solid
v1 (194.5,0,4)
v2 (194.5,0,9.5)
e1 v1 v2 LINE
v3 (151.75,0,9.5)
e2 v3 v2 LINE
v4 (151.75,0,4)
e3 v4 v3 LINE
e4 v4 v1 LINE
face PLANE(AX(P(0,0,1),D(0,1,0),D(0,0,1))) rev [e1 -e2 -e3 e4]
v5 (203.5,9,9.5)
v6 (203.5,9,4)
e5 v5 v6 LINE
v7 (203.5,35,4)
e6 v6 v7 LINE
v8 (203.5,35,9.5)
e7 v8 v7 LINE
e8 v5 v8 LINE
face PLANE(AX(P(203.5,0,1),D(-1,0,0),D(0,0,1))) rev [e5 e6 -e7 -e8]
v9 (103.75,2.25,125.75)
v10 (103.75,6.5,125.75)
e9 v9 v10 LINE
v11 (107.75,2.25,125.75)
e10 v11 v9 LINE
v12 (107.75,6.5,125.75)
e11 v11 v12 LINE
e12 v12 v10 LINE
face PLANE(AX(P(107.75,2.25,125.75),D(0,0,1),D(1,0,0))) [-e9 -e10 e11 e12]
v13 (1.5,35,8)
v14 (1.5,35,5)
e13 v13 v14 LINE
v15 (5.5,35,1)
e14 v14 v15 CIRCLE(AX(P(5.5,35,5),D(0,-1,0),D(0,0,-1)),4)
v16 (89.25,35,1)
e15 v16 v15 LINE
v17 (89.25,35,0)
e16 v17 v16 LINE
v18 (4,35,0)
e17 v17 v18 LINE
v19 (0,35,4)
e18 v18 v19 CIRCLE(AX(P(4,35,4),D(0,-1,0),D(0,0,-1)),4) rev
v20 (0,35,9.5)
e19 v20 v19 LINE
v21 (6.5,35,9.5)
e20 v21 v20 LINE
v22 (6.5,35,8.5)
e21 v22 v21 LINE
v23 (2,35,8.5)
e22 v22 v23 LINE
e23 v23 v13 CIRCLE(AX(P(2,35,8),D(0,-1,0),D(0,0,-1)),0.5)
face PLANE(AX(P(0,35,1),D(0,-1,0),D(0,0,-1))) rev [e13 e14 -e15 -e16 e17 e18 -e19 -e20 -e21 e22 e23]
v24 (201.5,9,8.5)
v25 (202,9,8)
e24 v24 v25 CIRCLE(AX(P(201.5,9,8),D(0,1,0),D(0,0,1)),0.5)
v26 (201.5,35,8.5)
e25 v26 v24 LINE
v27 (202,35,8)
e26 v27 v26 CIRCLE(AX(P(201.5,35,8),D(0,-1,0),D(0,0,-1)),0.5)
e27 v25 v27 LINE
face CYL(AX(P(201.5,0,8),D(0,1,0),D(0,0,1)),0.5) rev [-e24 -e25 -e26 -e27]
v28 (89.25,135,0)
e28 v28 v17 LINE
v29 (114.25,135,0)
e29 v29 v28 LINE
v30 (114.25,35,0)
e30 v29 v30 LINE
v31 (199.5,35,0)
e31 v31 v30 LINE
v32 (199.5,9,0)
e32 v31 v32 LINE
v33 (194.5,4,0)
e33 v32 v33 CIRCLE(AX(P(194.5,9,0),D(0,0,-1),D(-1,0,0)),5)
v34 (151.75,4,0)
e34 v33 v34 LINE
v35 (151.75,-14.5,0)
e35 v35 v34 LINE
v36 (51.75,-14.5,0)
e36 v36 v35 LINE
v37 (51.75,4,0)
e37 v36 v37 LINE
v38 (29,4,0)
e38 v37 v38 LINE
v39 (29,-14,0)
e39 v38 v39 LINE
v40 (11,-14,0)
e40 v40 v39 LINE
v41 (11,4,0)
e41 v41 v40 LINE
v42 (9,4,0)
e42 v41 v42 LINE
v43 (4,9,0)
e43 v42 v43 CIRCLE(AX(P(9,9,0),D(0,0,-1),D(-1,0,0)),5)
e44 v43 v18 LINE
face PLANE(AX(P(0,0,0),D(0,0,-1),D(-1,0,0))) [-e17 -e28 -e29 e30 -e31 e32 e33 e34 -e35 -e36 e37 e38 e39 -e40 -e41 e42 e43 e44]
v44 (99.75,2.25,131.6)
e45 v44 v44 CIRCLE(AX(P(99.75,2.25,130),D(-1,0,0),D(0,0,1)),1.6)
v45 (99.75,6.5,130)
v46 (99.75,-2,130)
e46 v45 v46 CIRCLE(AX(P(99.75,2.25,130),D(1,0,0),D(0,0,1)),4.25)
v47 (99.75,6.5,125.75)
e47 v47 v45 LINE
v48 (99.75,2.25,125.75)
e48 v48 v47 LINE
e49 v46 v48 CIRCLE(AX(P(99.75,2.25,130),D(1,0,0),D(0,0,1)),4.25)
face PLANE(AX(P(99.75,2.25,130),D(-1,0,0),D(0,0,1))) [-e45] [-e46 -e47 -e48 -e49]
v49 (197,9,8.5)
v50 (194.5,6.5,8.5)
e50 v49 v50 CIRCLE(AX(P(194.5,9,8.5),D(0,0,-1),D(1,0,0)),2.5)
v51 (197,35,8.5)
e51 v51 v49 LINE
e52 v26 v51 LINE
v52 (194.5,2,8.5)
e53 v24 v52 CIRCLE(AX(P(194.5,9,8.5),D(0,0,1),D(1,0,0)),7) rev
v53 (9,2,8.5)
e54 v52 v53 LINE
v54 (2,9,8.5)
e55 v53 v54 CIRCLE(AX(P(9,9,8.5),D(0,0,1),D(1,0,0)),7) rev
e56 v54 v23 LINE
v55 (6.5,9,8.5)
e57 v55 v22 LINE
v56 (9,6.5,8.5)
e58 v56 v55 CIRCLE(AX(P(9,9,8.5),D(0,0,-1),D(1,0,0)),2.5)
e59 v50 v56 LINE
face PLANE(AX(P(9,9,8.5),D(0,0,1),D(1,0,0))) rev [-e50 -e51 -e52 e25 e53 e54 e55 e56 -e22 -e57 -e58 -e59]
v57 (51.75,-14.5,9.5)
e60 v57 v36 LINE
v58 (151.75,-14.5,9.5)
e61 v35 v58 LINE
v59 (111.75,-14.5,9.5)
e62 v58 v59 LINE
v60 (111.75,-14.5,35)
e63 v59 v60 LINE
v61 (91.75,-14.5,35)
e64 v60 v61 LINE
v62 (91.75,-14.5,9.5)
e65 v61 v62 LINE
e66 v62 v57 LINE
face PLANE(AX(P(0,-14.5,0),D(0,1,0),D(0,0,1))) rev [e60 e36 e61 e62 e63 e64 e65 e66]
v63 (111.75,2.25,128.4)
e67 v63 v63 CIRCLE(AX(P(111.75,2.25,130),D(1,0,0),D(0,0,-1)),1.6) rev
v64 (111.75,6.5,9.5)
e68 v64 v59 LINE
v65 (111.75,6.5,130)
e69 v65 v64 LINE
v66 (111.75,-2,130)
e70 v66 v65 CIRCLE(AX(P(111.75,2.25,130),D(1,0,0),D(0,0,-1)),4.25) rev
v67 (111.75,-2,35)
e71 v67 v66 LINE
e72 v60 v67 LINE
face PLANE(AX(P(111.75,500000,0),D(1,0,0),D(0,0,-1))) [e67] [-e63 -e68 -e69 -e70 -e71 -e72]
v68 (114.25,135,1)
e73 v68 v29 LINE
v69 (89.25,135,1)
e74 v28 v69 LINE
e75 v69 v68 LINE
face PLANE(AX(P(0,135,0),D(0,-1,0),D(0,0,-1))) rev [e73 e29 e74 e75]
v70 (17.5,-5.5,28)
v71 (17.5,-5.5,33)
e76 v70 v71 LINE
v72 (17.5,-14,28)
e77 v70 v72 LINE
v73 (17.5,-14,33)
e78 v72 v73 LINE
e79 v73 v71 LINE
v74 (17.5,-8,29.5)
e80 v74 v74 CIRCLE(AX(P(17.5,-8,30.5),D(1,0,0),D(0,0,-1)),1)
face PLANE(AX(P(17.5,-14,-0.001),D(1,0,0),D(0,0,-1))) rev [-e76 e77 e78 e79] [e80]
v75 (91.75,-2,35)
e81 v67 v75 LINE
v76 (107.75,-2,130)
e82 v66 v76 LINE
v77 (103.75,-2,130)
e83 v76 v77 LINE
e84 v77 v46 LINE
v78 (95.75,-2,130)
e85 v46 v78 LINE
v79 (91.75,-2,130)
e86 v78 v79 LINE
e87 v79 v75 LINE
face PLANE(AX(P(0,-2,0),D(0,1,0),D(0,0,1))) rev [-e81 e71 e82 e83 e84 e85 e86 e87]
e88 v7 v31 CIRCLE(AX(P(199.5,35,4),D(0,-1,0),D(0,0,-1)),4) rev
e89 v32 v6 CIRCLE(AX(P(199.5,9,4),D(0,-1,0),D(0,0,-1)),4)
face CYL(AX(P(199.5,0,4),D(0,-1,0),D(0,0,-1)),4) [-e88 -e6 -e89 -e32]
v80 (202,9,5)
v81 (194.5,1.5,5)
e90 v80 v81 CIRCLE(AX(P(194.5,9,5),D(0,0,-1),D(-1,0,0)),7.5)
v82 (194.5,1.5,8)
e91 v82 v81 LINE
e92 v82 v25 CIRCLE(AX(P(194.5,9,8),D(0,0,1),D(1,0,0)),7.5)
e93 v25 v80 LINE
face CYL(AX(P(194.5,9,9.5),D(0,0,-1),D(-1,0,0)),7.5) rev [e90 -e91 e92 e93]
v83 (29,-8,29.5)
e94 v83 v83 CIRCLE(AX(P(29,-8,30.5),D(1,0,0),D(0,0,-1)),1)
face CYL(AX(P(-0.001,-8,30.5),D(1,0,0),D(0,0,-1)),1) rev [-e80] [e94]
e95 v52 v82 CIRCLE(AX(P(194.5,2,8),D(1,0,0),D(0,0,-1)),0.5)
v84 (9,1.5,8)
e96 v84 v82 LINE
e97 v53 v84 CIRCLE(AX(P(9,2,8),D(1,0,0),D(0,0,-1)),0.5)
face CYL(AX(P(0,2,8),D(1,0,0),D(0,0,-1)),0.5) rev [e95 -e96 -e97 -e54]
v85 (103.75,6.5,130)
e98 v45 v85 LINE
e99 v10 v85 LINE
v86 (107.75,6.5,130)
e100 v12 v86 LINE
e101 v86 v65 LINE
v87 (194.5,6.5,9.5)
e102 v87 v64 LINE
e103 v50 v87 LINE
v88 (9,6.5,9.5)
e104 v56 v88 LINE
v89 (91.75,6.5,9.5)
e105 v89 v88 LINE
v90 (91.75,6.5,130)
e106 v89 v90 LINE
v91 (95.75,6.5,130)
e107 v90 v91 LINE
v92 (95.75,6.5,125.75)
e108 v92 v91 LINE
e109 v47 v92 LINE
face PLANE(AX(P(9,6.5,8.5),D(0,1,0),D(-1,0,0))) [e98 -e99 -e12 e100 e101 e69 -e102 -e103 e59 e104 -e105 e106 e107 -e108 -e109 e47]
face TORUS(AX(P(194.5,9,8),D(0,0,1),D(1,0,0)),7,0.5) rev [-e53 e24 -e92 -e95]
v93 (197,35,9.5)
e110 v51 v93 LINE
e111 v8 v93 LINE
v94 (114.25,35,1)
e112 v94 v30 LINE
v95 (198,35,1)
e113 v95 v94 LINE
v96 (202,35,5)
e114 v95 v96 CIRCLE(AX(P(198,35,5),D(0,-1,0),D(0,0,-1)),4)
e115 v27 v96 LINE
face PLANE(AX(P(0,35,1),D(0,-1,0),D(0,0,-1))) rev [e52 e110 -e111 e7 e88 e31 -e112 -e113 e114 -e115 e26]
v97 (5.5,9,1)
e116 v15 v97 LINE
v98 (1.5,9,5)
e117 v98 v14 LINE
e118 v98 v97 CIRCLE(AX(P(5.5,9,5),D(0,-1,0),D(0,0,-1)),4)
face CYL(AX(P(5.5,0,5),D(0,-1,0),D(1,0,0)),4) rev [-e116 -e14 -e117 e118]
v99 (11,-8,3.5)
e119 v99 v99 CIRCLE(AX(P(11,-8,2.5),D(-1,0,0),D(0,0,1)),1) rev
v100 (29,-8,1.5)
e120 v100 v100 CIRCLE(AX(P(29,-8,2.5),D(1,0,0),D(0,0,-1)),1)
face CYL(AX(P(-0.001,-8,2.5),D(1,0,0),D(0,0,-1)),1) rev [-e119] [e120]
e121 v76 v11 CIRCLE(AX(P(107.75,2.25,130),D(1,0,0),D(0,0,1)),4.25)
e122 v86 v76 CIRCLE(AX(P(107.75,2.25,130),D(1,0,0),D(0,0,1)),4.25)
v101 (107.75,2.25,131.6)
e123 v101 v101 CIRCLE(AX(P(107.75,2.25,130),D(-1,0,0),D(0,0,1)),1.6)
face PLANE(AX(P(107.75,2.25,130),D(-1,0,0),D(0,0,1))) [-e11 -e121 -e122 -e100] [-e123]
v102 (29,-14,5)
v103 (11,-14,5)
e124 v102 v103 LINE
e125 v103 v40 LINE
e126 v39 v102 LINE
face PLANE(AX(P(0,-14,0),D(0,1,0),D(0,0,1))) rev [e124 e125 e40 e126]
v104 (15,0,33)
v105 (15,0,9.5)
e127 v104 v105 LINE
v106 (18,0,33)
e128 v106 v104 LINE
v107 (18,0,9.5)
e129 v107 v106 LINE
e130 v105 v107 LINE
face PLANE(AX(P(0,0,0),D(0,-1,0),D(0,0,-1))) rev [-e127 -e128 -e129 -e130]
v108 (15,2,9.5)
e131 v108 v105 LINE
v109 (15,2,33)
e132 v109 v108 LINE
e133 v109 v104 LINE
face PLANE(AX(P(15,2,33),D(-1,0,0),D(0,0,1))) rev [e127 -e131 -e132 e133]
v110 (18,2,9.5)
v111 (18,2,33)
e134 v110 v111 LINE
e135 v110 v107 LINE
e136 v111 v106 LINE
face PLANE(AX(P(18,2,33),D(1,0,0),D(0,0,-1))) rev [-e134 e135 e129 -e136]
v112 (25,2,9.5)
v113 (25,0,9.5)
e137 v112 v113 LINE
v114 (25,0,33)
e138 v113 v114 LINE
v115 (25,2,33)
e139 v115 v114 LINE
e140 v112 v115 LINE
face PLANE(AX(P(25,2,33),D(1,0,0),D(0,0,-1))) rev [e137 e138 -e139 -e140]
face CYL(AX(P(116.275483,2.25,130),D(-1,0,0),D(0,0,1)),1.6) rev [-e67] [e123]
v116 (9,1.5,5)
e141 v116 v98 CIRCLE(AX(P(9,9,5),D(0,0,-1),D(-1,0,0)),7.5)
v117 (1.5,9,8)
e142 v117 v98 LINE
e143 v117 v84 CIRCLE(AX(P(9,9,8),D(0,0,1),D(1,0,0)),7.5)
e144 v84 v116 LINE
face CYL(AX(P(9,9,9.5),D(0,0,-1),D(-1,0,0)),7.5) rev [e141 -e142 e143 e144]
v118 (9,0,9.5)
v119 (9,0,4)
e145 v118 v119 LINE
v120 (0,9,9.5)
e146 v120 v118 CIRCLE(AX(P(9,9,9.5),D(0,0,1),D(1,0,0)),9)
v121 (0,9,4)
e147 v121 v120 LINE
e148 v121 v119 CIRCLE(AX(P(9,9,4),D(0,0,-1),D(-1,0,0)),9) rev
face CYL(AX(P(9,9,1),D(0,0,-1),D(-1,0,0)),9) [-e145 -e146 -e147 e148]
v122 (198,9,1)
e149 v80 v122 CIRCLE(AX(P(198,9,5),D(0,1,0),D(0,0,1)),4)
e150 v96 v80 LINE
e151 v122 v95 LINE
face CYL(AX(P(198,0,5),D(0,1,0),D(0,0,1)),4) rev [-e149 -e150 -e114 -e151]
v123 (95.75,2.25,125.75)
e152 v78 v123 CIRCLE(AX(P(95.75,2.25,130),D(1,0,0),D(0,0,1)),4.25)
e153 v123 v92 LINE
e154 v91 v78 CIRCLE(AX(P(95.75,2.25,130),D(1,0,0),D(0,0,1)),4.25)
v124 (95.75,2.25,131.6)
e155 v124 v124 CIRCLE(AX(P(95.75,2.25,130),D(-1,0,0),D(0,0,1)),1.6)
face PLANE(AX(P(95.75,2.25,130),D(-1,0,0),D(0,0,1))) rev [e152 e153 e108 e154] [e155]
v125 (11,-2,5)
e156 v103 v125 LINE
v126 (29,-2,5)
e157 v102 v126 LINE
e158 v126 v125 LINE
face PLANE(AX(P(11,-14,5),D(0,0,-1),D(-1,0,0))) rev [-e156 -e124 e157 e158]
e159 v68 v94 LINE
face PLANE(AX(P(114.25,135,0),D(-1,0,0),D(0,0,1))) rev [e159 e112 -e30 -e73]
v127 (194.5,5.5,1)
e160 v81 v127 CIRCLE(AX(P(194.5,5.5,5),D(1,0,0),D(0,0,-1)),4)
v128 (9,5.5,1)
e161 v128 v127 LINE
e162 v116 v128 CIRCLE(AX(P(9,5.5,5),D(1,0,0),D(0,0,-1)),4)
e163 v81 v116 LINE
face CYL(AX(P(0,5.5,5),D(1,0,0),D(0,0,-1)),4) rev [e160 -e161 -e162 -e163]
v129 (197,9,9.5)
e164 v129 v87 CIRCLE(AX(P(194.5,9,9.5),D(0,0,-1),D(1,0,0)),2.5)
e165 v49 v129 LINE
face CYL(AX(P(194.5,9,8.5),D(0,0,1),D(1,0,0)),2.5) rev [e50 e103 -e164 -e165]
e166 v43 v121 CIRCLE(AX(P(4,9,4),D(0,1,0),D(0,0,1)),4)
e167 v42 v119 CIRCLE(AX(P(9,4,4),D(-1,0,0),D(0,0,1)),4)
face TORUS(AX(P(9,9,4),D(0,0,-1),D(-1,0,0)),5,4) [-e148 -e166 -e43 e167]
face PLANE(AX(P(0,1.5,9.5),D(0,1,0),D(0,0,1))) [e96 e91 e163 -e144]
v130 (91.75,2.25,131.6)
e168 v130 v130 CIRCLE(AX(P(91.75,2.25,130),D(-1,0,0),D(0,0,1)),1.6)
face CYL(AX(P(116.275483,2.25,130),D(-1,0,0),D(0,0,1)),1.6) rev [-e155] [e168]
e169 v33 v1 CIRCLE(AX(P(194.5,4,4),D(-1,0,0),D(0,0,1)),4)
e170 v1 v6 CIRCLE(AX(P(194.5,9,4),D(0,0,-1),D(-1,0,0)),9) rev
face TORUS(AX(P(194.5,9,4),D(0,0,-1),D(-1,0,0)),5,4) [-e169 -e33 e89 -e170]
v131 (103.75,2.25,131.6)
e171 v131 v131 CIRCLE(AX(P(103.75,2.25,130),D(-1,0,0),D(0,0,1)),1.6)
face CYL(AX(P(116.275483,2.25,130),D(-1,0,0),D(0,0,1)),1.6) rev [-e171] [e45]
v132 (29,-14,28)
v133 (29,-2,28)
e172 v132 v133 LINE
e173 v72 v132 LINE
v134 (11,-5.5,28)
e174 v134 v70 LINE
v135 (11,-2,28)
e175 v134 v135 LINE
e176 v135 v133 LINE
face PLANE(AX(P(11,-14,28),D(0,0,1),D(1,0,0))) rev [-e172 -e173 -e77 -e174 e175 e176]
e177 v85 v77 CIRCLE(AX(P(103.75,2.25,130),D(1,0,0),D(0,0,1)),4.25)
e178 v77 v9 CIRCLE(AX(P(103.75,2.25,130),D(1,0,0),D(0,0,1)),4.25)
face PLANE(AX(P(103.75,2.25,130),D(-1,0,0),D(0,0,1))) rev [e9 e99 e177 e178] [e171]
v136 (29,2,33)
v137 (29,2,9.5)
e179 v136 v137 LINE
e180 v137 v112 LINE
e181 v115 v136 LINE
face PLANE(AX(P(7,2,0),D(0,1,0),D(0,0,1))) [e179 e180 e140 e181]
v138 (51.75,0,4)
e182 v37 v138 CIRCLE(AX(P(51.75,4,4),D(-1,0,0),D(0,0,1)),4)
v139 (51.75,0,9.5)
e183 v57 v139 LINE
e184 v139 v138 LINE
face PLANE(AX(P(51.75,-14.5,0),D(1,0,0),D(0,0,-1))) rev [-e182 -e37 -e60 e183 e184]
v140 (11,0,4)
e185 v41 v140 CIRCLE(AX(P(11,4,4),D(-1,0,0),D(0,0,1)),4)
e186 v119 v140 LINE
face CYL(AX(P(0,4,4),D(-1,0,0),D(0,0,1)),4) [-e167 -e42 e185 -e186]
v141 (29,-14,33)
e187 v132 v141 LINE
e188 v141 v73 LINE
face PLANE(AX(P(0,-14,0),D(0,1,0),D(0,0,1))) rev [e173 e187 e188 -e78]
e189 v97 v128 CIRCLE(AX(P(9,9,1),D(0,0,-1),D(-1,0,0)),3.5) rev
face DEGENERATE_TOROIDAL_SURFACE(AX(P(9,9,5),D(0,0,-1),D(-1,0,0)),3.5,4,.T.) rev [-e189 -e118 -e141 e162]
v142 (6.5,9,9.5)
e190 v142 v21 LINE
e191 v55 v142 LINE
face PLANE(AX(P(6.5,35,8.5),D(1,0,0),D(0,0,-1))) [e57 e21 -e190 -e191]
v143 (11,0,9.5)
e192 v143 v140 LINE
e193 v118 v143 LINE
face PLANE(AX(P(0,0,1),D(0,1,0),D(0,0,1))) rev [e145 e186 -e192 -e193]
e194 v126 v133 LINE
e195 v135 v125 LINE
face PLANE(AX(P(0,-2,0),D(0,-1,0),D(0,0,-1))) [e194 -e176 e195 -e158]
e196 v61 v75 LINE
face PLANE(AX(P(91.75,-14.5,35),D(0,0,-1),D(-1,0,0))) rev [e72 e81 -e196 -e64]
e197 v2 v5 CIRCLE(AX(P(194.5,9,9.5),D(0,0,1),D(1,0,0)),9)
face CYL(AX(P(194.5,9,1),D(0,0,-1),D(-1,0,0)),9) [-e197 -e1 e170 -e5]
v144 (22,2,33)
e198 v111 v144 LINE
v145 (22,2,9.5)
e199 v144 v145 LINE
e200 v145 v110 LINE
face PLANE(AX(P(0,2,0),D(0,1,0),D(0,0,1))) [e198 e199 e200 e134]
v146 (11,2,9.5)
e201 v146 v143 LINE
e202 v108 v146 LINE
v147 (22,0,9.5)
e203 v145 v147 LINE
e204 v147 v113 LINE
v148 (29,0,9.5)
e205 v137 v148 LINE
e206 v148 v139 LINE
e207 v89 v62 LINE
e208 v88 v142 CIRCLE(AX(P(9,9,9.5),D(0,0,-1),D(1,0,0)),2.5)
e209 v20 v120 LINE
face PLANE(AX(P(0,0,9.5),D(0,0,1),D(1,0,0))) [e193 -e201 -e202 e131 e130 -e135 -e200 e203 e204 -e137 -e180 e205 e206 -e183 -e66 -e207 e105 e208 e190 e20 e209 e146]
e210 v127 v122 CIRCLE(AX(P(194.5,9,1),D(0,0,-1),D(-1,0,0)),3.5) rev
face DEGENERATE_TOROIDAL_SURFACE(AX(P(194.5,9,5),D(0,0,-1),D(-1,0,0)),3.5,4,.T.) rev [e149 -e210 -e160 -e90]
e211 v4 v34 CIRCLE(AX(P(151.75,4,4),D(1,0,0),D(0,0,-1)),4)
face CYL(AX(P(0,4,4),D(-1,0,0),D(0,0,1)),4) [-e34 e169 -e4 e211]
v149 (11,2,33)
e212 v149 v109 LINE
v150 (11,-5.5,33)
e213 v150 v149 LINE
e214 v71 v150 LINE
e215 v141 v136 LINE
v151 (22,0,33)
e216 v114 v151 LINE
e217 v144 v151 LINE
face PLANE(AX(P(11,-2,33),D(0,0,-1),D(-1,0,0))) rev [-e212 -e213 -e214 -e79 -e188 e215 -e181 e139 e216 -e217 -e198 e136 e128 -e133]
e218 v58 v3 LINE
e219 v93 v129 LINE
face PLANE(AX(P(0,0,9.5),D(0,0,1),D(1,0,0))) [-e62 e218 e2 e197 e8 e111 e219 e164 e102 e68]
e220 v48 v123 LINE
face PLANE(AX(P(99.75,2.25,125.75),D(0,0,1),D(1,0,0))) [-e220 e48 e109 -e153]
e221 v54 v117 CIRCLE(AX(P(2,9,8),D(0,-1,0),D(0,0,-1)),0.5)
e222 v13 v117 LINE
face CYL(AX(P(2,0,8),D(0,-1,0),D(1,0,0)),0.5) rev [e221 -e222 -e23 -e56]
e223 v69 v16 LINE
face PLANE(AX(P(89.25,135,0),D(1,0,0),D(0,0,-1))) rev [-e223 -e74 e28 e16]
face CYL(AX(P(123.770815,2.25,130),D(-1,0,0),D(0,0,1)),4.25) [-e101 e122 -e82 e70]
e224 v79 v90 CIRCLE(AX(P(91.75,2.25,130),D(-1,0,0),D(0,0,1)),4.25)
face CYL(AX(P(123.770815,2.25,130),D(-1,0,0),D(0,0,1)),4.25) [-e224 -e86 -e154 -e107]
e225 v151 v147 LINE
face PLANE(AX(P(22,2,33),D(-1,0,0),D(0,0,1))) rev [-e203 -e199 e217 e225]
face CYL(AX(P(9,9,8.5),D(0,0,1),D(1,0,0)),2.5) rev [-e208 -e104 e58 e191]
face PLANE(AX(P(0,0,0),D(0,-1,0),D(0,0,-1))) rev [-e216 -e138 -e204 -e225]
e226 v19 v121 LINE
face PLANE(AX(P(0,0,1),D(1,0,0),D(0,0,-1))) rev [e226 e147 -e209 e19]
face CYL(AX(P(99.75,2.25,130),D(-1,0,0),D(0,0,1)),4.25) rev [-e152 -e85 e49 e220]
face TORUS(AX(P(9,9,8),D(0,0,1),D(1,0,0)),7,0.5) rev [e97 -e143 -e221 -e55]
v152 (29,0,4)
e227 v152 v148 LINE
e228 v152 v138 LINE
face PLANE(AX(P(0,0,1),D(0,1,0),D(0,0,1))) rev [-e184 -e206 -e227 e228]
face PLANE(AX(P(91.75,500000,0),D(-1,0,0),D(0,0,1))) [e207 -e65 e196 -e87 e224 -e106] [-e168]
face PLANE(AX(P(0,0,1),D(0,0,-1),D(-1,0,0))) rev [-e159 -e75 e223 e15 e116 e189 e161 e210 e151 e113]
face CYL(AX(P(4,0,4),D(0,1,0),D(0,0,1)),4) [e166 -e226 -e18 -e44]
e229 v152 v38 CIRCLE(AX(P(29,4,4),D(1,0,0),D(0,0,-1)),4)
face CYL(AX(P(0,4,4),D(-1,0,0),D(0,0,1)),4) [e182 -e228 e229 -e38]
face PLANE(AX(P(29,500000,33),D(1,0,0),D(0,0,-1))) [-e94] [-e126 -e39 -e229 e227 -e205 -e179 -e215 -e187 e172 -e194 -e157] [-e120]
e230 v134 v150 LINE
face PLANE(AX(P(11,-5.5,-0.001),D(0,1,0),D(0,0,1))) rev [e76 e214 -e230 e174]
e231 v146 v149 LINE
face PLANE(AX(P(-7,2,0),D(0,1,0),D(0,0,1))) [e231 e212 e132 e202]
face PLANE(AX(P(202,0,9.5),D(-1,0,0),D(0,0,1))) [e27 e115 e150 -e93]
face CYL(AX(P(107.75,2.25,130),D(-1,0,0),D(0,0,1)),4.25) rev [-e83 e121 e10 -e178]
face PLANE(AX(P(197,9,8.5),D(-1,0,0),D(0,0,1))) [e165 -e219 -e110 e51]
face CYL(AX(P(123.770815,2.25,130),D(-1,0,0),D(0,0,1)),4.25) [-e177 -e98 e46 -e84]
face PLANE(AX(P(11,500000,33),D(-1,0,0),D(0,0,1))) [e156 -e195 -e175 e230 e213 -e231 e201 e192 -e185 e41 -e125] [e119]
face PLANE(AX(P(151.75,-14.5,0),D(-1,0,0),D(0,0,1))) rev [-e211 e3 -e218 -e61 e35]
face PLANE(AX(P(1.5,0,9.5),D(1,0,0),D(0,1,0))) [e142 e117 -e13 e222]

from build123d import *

# Parameters (mm, degrees)
ESQUISSE1_W                    = 203.5
ESQUISSE1_H                    = 35
BOSS_EXTRU_1_DEPTH             = 1
CONG_1_R                       = 9
BOSS_EXTRU_2_START             = 8.5
BOSS_EXTRU_2_DEPTH             = 8.5
BOSS_EXTRU_3_DEPTH             = 1
CONG_2_R                       = 4
CONG_3_R                       = 0.5
BOSS_EXTRU_4_START             = 91.75
BOSS_EXTRU_4_DEPTH             = 20
ESQUISSE8_W                    = 20
ESQUISSE8_H                    = 120.5
BOSS_EXTRU_5_DEPTH             = 6.5
ESQUISSE9_R                    = 4.25
BOSS_EXTRU_6_DEPTH             = 20
BOSS_EXTRU_10_START            = 51.75
BOSS_EXTRU_10_DEPTH            = 100
BOSS_EXTRU_10_START_2          = 91.75
BOSS_EXTRU_10_2_OUTLINE_W      = 12.5
BOSS_EXTRU_10_2_OUTLINE_H      = 25.5
BOSS_EXTRU_10_2_DEPTH          = 20
ESQUISSE21_W                   = 25
ESQUISSE21_H                   = 1
BOSS_EXTRU_11_DEPTH            = 100
ENL_V_MAT_EXTRU_2_DEPTH        = 4
R_P_TITION_LIN_AIRE2_COUNT     = 2
R_P_TITION_LIN_AIRE2_PITCH     = 8
ENL_V_START                    = -20
ESQUISSE12_R                   = 1.6
ENL_V_MAT_EXTRU_4_DEPTH        = 20
BOSS_EXTRU_7_START             = 11
BOSS_EXTRU_7_DEPTH             = 18
ESQUISSE15_W                   = 18
ESQUISSE15_H                   = 5
BOSS_EXTRU_8_DEPTH             = 12
ENL_V_MAT_EXTRU_5_REACH        = 260.26
ESQUISSE16_R                   = 1
ESQUISSE17_W                   = 4
ESQUISSE17_H                   = 23.5
BOSS_EXTRU_9_DEPTH             = 2
R_P_TITION_LIN_AIRE1_COUNT     = 2
R_P_TITION_LIN_AIRE1_PITCH     = 7
R_P_TITION_LIN_AIRE1_COL_COUNT = 2
R_P_TITION_LIN_AIRE1_COL_PITCH = 7
ENL_V_MAT_EXTRU_6_REACH        = 266.365
ESQUISSE18_W                   = 6.5
ESQUISSE18_H                   = 8.5


# Read off the part's stored shape, not the designer's step: Boss.-Extru.4, Boss.-Extru.10, Boss.-Extru.7
with BuildPart() as part:
    # Esquisse1 → Boss.-Extru.1 (new body)
    with BuildSketch(Plane.XY):
        with Locations((101.75, 17.5)):
            Rectangle(ESQUISSE1_W, ESQUISSE1_H)
    extrude(amount=BOSS_EXTRU_1_DEPTH)

    # Congé1
    cong_1_edges = [part.edges().sort_by_distance(p)[0] for p in [
        (203.5, 0, 0.5),
        (0, 0, 0.5),
    ]]
    fillet(cong_1_edges, radius=CONG_1_R)

    # Esquisse3 → Boss.-Extru.2 (add)
    with BuildSketch(Plane.XY.offset(1).offset(BOSS_EXTRU_2_START)):
        with BuildLine():
            Line((1.5, 33.5), (1.5, 35))
            Line((1.5, 35), (0, 35))
            Line((0, 35), (0, 9))
            ThreePointArc((0, 9), (2.636038969, 2.636038969), (9, 0))
            Line((9, 0), (194.5, 0))
            ThreePointArc((194.5, 0), (200.863961031, 2.636038969), (203.5, 9))
            Line((203.5, 9), (203.5, 35))
            Line((203.5, 35), (202, 35))
            Line((202, 35), (202, 33.5))
            Line((202, 33.5), (202, 9))
            ThreePointArc((202, 9), (199.803300859, 3.696699141), (194.5, 1.5))
            Line((194.5, 1.5), (9, 1.5))
            ThreePointArc((9, 1.5), (3.696699141, 3.696699141), (1.5, 9))
            Line((1.5, 9), (1.5, 33.5))
        make_face()
    extrude(amount=-BOSS_EXTRU_2_DEPTH)

    # Esquisse4 → Boss.-Extru.3 (add)
    with BuildSketch(Plane.XY.offset(9.5)):
        with BuildLine():
            Line((6.5, 35), (6.5, 9))
            ThreePointArc((6.5, 9), (7.232233047, 7.232233047), (9, 6.5))
            Line((9, 6.5), (194.5, 6.5))
            ThreePointArc((194.5, 6.5), (196.267766953, 7.232233047), (197, 9))
            Line((197, 9), (197, 35))
            Line((197, 35), (203.5, 35))
            Line((203.5, 35), (203.5, 9))
            ThreePointArc((203.5, 9), (200.863961031, 2.636038969), (194.5, 0))
            Line((194.5, 0), (9, 0))
            ThreePointArc((9, 0), (2.636038969, 2.636038969), (0, 9))
            Line((0, 9), (0, 35))
            Line((0, 35), (6.5, 35))
        make_face()
    extrude(amount=-BOSS_EXTRU_3_DEPTH)

    # Congé2
    cong_2_edges = [part.edges().sort_by_distance(p)[0] for p in [
        (203.5, 22, 0),
        (101.75, 0, 0),
        (2.636038969, 2.636038969, 0),
        (200.863961031, 2.636038969, 0),
        (3.696699141, 3.696699141, 1),
        (101.75, 1.5, 1),
        (199.803300859, 3.696699141, 1),
        (202, 22, 1),
        (1.5, 22, 1),
        (0, 22, 0),
    ]]
    fillet(cong_2_edges, radius=CONG_2_R)

    # Congé3
    cong_3_edges = [part.edges().sort_by_distance(p)[0] for p in [
        (101.75, 1.5, 8.5),
        (1.5, 22, 8.5),
        (3.696699141, 3.696699141, 8.5),
        (199.803300859, 3.696699141, 8.5),
        (202, 22, 8.5),
    ]]
    fillet(cong_3_edges, radius=CONG_3_R)

    # Boss.-Extru.4 outline → Boss.-Extru.4 (add)
    with BuildSketch(Plane.YZ.offset(BOSS_EXTRU_4_START)):
        with BuildLine():
            Line((-2, 130), (-2, 0))
            Line((-2, 0), (4, 0))
            ThreePointArc((4, 0), (1.171572875, 1.171572875), (0, 4))
            Line((0, 4), (0, 130))
            Line((0, 130), (-2, 130))
        make_face()
    extrude(amount=BOSS_EXTRU_4_DEPTH)

    # Esquisse8 → Boss.-Extru.5 (add)
    with BuildSketch(Plane(origin=(0, 0, 0), x_dir=(1, 0, 0), z_dir=(0, 1, 0))):
        with Locations((101.75, -69.75)):
            Rectangle(ESQUISSE8_W, ESQUISSE8_H)
    extrude(amount=BOSS_EXTRU_5_DEPTH)

    # Esquisse9 → Boss.-Extru.6 (add)
    with BuildSketch(Plane.ZY.offset(-91.75)):
        with Locations((130, 2.25)):
            Circle(ESQUISSE9_R)
    extrude(amount=-BOSS_EXTRU_6_DEPTH)

    # Boss.-Extru.10 outline → Boss.-Extru.10 (add)
    with BuildSketch(Plane.YZ.offset(BOSS_EXTRU_10_START)):
        with BuildLine():
            Line((0, 4), (0, 9.5))
            Line((0, 9.5), (-14.5, 9.5))
            Line((-14.5, 9.5), (-14.5, 0))
            Line((-14.5, 0), (4, 0))
            ThreePointArc((4, 0), (1.171572875, 1.171572875), (0, 4))
        make_face()
    extrude(amount=BOSS_EXTRU_10_DEPTH)

    # Boss.-Extru.10 2 outline → Boss.-Extru.10 2 (add)
    with BuildSketch(Plane.YZ.offset(BOSS_EXTRU_10_START_2)):
        with Locations((-8.25, 22.25)):
            Rectangle(BOSS_EXTRU_10_2_OUTLINE_W, BOSS_EXTRU_10_2_OUTLINE_H)
    extrude(amount=BOSS_EXTRU_10_2_DEPTH)

    # Esquisse21 → Boss.-Extru.11 (add)
    with BuildSketch(Plane(origin=(0, 35, 0), x_dir=(1, 0, 0), z_dir=(0, 1, 0))):
        with Locations((101.75, -0.5)):
            Rectangle(ESQUISSE21_W, ESQUISSE21_H)
    extrude(amount=BOSS_EXTRU_11_DEPTH)

    # Esquisse10 → Enlèv. mat.-Extru.2 (cut)
    with BuildSketch(Plane(origin=(95.75, 0, 0), x_dir=(0, 0, -1), z_dir=(1, 0, 0))):
        with BuildLine():
            Line((-125.75, 2.25), (-125.75, 6.5))
            Line((-125.75, 6.5), (-130, 6.5))
            ThreePointArc((-130, 6.5), (-133.00520382, -0.75520382), (-125.75, 2.25))
        make_face()
    enl_v_mat_extru_2 = extrude(amount=ENL_V_MAT_EXTRU_2_DEPTH, mode=Mode.SUBTRACT)

    # Répétition linéaire2: Enlèv. mat.-Extru.2 ×2
    with Locations(*[(i * R_P_TITION_LIN_AIRE2_PITCH, 0, 0) for i in range(1, R_P_TITION_LIN_AIRE2_COUNT)]):
        add(enl_v_mat_extru_2, mode=Mode.SUBTRACT)

    # Esquisse12 → Enlèv. mat.-Extru.4 (cut)
    with BuildSketch(Plane.ZY.offset(-91.75).offset(ENL_V_START)):
        with Locations((130, 2.25)):
            Circle(ESQUISSE12_R)
    extrude(amount=ENL_V_MAT_EXTRU_4_DEPTH, mode=Mode.SUBTRACT)

    # Boss.-Extru.7 outline → Boss.-Extru.7 (add)
    with BuildSketch(Plane.YZ.offset(BOSS_EXTRU_7_START)):
        with BuildLine():
            Line((0, 33), (-2, 33))
            Line((-2, 33), (-2, 0))
            Line((-2, 0), (4, 0))
            ThreePointArc((4, 0), (1.171572875, 1.171572875), (0, 4))
            Line((0, 4), (0, 33))
        make_face()
    extrude(amount=BOSS_EXTRU_7_DEPTH)

    # Esquisse15 → Boss.-Extru.8 (add)
    with BuildSketch(Plane.XZ.offset(2)):
        with Locations((20, 2.5)):
            Rectangle(ESQUISSE15_W, ESQUISSE15_H)
        with Locations((20, 30.5)):
            Rectangle(ESQUISSE15_W, ESQUISSE15_H)
    extrude(amount=BOSS_EXTRU_8_DEPTH)

    # Esquisse16 → Enlèv. mat.-Extru.5 (cut, up to next)
    with BuildSketch(Plane(origin=(29, 0, 0), x_dir=(0, 0, -1), z_dir=(1, 0, 0)), mode=Mode.PRIVATE) as enl_v_mat_extru_5_sk1:
        with Locations((-30.5, -8)):
            Circle(ESQUISSE16_R)
    enl_v_mat_extru_5_tool1 = extrude(enl_v_mat_extru_5_sk1.sketch, amount=-ENL_V_MAT_EXTRU_5_REACH, mode=Mode.PRIVATE) & part.part
    # Esquisse16 → Enlèv. mat.-Extru.5 (cut, up to next)
    with BuildSketch(Plane(origin=(29, 0, 0), x_dir=(0, 0, -1), z_dir=(1, 0, 0)), mode=Mode.PRIVATE) as enl_v_mat_extru_5_sk2:
        with Locations((-2.5, -8)):
            Circle(ESQUISSE16_R)
    enl_v_mat_extru_5_tool2 = extrude(enl_v_mat_extru_5_sk2.sketch, amount=-ENL_V_MAT_EXTRU_5_REACH, mode=Mode.PRIVATE) & part.part
    add(enl_v_mat_extru_5_tool1.solids().sort_by_distance((29, -8, 30.5))[0], mode=Mode.SUBTRACT)
    add(enl_v_mat_extru_5_tool2.solids().sort_by_distance((29, -8, 2.5))[0], mode=Mode.SUBTRACT)

    # Esquisse17 → Boss.-Extru.9 (add)
    with BuildSketch(Plane(origin=(0, 0, 0), x_dir=(1, 0, 0), z_dir=(0, 1, 0))):
        with Locations((20, -21.25)):
            Rectangle(ESQUISSE17_W, ESQUISSE17_H)
    boss_extru_9 = extrude(amount=BOSS_EXTRU_9_DEPTH)

    # Répétition linéaire1: Boss.-Extru.9 ×2
    with Locations(*[(i * R_P_TITION_LIN_AIRE1_PITCH, 0, 0) for i in range(1, R_P_TITION_LIN_AIRE1_COUNT)]):
        add(boss_extru_9)

    # Répétition linéaire1 col: Boss.-Extru.9 ×2
    with Locations(*[(-i * R_P_TITION_LIN_AIRE1_COL_PITCH, 0, 0) for i in range(1, R_P_TITION_LIN_AIRE1_COL_COUNT)]):
        add(boss_extru_9)

    # Esquisse18 → Enlèv. mat.-Extru.6 (cut, up to next)
    with BuildSketch(Plane.XY.offset(33), mode=Mode.PRIVATE) as enl_v_mat_extru_6_sk1:
        with Locations((14.25, -9.75)):
            Rectangle(ESQUISSE18_W, ESQUISSE18_H)
    enl_v_mat_extru_6_tool1 = extrude(enl_v_mat_extru_6_sk1.sketch, amount=-ENL_V_MAT_EXTRU_6_REACH, mode=Mode.PRIVATE) & part.part
    add(enl_v_mat_extru_6_tool1.solids().sort_by_distance((14.25, -9.75, 33))[0], mode=Mode.SUBTRACT)


solid = part.part
